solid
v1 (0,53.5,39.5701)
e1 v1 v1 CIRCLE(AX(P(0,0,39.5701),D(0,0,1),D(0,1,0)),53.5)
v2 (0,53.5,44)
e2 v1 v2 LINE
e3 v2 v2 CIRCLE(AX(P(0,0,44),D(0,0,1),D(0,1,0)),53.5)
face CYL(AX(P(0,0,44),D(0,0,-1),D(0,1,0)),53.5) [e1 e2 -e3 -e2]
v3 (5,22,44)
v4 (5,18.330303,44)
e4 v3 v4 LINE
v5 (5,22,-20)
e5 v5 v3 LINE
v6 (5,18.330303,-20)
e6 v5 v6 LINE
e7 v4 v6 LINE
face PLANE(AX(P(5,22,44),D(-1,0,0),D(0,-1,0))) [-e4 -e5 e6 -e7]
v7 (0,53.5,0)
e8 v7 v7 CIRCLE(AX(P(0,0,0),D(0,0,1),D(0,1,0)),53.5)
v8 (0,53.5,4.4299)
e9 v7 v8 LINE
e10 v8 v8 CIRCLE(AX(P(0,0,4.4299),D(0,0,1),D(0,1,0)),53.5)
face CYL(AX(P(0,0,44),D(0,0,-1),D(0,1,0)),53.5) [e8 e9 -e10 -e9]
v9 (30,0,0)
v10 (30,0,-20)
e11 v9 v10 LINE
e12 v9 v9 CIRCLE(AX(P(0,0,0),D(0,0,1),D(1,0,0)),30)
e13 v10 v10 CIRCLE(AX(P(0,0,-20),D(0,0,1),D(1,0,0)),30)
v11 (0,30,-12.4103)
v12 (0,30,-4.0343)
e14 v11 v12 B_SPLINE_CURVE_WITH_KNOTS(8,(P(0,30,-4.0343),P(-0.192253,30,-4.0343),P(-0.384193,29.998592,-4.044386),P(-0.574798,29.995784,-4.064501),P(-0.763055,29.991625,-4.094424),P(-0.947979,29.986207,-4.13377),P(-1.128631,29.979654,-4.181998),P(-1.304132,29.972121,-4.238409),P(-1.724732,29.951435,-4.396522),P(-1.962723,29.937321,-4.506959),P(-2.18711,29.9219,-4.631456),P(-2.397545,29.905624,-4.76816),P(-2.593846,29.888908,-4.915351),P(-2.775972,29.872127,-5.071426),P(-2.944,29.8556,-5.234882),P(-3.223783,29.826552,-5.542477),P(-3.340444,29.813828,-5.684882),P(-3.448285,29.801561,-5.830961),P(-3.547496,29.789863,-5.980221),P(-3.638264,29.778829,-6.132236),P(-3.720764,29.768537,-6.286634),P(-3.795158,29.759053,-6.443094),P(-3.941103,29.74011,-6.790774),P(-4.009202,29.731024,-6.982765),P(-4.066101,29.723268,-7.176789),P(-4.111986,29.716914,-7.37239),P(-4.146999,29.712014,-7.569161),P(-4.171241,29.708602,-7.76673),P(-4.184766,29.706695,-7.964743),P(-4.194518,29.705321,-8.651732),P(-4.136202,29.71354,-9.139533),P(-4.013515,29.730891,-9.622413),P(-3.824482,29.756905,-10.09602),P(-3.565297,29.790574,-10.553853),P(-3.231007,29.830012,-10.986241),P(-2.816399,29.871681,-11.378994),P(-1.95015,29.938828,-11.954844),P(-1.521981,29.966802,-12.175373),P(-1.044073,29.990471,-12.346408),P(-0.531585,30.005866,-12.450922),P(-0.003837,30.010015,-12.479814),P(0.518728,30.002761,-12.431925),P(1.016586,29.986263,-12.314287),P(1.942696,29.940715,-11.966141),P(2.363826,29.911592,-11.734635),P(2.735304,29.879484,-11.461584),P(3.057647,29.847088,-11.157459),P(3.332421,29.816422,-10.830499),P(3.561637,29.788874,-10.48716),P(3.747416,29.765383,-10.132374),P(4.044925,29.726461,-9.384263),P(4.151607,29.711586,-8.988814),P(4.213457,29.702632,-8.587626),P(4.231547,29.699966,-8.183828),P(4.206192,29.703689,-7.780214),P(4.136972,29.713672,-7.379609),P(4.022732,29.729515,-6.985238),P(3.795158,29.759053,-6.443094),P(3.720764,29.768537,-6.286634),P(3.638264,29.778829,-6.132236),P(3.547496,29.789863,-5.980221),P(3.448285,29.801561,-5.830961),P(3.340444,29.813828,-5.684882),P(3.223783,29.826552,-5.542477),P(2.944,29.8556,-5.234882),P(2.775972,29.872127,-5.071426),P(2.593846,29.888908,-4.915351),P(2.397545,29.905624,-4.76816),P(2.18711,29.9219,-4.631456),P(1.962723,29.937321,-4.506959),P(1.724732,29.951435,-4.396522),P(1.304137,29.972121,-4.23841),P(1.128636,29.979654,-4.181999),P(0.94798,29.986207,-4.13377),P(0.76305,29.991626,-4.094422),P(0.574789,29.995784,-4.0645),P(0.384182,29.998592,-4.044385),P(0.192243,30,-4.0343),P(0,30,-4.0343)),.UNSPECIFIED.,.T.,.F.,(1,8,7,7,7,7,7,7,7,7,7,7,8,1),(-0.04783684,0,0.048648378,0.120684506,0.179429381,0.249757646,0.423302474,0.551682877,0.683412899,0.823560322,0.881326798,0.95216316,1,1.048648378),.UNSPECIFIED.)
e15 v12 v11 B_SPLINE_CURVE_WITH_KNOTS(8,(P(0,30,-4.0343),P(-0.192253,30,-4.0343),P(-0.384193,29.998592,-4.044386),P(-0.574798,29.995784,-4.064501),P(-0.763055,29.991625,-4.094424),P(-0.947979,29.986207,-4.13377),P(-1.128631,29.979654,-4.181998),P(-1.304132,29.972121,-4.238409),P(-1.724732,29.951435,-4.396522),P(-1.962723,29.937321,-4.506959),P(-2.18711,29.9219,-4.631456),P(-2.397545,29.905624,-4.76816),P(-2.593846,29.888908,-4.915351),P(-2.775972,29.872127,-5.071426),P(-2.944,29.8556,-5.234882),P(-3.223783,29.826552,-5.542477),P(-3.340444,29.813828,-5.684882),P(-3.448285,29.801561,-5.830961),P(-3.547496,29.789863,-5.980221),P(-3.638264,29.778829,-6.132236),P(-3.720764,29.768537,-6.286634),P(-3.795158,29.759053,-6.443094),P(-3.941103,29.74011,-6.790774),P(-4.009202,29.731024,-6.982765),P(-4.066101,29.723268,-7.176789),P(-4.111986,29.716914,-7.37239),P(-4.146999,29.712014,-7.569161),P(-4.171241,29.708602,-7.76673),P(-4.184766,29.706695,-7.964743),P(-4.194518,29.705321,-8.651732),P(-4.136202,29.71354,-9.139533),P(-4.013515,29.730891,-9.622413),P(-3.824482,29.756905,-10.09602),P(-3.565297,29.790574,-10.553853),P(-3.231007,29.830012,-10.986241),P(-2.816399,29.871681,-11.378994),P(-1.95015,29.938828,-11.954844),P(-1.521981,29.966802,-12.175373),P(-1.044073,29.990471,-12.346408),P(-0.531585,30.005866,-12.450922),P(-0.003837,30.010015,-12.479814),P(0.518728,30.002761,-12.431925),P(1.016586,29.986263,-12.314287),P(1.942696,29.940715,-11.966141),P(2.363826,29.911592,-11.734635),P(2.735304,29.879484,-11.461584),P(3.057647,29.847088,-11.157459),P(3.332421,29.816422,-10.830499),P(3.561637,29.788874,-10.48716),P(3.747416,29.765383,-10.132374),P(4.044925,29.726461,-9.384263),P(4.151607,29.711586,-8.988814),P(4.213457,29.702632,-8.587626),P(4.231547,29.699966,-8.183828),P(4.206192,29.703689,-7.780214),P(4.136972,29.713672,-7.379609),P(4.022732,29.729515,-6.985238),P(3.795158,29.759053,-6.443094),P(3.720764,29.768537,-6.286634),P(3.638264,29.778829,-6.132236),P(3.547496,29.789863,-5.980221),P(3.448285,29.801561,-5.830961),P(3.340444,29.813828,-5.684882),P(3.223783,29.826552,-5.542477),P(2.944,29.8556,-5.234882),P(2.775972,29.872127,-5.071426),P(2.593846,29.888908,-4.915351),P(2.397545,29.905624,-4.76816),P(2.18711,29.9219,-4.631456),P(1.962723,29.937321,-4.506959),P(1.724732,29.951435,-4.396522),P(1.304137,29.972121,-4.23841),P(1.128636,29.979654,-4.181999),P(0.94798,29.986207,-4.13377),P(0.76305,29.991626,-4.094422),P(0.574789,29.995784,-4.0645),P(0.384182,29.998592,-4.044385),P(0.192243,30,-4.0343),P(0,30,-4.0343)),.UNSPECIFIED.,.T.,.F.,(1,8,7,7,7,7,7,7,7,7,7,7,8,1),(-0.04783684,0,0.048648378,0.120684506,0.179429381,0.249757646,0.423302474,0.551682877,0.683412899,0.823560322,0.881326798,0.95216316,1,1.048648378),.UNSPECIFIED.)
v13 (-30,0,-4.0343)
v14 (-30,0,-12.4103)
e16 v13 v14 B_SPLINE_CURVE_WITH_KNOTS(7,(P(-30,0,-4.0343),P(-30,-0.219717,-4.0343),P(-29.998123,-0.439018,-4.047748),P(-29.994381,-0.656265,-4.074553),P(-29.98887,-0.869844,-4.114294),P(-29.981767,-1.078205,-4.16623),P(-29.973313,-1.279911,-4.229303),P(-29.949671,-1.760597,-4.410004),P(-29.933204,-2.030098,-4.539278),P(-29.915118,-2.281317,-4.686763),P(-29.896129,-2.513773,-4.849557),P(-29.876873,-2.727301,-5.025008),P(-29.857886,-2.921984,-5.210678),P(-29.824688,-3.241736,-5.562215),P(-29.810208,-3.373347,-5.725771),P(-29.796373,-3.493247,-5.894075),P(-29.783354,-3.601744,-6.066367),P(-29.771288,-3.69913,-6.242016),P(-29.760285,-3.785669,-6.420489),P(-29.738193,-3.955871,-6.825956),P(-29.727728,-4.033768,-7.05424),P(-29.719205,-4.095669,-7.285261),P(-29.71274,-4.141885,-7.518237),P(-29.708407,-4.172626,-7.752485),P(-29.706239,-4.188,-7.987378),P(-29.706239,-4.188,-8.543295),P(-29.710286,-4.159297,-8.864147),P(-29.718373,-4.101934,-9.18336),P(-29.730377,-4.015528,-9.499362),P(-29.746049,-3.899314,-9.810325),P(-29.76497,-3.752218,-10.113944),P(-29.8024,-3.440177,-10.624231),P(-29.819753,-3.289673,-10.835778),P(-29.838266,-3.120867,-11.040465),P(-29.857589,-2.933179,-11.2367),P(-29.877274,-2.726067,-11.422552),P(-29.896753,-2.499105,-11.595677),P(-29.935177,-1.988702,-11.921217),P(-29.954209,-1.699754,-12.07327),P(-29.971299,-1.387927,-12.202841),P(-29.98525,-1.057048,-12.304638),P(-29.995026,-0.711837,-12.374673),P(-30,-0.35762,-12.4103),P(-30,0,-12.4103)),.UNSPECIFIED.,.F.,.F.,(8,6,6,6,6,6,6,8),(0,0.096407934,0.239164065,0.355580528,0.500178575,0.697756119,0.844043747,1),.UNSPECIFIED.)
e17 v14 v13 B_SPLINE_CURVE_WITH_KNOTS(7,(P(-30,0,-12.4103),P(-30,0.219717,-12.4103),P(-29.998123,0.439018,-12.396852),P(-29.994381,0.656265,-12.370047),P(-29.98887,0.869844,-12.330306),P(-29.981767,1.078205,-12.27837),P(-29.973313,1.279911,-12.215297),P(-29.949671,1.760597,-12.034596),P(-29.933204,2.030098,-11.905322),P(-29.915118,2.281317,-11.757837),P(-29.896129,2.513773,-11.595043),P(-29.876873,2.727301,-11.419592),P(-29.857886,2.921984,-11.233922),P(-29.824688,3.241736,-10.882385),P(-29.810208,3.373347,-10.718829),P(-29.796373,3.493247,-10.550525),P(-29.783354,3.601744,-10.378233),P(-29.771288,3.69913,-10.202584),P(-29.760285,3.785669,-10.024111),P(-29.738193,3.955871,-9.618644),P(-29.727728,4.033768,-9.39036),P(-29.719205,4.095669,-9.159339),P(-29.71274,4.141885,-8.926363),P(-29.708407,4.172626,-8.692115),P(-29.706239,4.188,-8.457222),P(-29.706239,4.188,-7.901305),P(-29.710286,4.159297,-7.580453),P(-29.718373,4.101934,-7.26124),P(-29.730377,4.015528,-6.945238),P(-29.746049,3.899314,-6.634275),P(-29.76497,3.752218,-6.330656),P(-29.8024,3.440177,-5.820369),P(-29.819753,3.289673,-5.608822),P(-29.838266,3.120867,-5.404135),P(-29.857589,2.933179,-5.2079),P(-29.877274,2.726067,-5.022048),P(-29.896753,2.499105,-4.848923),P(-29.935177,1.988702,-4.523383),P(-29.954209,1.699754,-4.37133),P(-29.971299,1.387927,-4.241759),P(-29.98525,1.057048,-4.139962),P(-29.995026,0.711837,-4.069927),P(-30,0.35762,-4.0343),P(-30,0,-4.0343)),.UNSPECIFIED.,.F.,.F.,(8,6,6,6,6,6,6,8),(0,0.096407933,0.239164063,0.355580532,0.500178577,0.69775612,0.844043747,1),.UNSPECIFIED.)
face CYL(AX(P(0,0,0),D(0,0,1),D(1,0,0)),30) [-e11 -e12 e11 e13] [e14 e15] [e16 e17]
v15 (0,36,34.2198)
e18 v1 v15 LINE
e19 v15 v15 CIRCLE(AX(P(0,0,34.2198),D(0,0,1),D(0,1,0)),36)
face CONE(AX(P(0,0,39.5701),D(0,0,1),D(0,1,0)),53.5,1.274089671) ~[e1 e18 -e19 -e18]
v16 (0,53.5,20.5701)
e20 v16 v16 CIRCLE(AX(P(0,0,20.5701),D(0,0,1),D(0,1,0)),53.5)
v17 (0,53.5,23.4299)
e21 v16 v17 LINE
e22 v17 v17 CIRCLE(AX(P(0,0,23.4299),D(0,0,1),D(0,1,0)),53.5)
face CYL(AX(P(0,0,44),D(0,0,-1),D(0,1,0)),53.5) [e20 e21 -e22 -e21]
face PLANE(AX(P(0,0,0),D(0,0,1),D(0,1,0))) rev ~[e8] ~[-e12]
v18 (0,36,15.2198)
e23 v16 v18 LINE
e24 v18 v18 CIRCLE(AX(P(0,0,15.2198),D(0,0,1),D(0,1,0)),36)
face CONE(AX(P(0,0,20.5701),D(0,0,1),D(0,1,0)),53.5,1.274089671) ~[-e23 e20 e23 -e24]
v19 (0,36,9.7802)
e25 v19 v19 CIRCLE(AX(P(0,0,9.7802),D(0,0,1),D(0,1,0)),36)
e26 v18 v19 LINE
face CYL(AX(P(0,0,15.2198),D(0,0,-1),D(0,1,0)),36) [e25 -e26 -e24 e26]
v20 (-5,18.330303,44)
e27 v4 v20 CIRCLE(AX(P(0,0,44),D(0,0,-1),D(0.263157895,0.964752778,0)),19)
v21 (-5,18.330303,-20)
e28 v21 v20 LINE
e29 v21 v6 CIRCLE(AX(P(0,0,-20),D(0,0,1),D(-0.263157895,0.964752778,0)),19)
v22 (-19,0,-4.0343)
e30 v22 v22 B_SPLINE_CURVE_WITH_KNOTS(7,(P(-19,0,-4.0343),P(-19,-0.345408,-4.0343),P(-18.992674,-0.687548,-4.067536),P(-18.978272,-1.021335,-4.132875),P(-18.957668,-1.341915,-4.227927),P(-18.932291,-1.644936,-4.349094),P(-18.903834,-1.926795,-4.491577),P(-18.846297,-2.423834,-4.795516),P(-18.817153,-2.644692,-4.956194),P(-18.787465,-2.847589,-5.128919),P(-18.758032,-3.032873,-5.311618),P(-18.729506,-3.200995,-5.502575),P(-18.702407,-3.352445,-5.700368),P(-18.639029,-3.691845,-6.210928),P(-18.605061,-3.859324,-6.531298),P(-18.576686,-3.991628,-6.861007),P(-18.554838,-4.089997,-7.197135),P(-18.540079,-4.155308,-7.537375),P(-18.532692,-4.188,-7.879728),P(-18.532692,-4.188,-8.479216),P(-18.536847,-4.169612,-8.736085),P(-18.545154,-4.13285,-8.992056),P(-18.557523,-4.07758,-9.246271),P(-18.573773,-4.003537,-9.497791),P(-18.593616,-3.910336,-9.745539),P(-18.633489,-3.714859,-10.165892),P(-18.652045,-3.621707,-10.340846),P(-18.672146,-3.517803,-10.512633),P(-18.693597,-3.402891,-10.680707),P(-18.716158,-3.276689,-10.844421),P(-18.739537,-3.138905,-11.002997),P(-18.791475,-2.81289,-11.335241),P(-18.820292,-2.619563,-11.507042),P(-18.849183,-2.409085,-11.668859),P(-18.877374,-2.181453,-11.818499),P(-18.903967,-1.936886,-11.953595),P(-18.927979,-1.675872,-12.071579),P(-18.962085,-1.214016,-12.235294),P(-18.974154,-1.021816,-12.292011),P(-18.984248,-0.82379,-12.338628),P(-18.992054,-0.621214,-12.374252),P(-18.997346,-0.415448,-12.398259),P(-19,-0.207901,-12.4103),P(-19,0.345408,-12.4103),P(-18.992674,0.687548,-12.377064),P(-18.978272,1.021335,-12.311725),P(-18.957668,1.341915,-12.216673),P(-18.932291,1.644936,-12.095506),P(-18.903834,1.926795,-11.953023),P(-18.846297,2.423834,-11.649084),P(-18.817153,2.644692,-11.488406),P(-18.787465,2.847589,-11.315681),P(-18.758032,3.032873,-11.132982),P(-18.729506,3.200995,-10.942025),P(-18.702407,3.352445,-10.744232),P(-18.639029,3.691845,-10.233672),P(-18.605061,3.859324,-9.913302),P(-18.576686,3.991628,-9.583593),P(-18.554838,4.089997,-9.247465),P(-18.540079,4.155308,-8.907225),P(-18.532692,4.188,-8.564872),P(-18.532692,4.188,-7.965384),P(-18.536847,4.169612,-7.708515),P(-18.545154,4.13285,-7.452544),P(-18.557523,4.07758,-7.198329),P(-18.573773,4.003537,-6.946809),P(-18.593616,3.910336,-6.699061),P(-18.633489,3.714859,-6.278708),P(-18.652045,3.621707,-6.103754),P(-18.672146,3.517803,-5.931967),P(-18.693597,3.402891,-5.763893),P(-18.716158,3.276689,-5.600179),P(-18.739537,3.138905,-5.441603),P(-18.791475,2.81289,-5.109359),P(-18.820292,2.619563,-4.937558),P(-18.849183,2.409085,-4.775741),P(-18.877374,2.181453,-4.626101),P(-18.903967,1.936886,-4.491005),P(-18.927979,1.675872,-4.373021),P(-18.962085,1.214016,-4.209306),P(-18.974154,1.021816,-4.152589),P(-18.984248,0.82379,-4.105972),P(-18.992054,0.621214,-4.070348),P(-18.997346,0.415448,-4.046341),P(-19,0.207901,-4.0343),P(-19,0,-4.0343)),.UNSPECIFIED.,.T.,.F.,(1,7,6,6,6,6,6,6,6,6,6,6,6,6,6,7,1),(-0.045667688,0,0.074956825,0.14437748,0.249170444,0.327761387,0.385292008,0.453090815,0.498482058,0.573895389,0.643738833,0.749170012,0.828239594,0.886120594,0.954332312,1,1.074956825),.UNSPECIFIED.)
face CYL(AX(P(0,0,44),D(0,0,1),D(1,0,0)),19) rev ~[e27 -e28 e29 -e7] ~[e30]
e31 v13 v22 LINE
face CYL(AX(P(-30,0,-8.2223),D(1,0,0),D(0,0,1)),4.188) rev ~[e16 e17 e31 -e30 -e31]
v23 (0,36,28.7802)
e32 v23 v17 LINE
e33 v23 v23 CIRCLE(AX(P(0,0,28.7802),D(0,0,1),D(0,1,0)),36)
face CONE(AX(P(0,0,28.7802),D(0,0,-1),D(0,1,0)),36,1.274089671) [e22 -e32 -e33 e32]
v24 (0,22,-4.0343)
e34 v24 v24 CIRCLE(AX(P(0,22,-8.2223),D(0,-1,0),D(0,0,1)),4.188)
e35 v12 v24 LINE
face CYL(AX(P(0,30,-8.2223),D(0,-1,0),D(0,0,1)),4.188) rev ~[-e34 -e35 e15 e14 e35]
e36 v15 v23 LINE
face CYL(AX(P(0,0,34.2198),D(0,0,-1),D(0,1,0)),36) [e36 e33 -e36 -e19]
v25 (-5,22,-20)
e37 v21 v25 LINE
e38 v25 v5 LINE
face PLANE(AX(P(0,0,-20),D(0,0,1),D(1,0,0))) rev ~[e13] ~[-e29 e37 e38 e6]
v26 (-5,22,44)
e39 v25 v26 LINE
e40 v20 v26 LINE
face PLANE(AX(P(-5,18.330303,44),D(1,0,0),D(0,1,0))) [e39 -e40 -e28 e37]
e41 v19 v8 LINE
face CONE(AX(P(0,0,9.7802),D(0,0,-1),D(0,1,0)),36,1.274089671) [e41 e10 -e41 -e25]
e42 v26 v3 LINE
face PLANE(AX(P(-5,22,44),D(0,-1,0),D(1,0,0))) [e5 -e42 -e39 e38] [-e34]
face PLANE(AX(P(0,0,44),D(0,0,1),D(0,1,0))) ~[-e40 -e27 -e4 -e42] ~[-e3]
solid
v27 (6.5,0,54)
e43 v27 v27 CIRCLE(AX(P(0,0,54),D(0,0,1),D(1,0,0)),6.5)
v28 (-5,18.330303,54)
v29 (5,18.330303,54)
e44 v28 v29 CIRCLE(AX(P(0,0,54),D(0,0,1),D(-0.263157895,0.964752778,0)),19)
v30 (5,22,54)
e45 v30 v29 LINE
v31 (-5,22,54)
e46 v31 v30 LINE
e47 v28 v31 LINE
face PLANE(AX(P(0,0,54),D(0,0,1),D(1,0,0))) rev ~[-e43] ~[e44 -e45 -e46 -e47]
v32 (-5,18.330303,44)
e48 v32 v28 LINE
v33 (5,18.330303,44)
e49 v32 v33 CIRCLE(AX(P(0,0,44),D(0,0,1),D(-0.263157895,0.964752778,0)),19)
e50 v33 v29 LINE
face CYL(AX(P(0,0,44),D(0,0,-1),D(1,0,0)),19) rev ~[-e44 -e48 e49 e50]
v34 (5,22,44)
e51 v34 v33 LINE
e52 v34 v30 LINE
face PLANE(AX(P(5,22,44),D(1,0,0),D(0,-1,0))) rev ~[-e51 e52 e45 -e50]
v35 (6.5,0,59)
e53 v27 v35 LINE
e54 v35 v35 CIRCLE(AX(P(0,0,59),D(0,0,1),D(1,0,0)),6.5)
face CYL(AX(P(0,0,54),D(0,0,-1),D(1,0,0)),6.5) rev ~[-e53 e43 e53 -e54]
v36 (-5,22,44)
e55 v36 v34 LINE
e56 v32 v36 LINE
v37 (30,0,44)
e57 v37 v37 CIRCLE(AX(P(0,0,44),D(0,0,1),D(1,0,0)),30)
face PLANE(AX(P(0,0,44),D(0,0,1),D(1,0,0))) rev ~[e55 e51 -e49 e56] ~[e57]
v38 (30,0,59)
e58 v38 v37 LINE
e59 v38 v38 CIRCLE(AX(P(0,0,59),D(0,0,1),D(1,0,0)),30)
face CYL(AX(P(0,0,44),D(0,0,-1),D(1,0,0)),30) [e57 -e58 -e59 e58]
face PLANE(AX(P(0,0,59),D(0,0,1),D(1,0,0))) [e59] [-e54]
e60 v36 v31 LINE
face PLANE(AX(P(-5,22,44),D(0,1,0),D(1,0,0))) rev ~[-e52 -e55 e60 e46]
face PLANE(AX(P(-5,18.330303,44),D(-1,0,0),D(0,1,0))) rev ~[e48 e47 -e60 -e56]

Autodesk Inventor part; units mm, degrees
ref_plane "YZ Plane" through (0, 0, 0) normal (1, 0, 0) x (0, 1, 0)
sketch "Main Sketch" plane through (0, 0, 0) normal (1, 0, 0) x (0, 1, 0)
  line L0 (0, 44) -> (53.5, 44)
  line L1 (53.5, 44) -> (53.5, 20.5701)
  line L2 (53.5, 20.5701) -> (36, 15.2198)
  line L3 (36, 15.2198) -> (36, 9.7802)
  line L4 (36, 9.7802) -> (53.5, 4.4299)
  line L5 (53.5, 4.4299) -> (53.5, 0)
  line L6 (53.5, 0) -> (0, 0)
  line L7 (50, 19.5) -> (50, 5.5) construction
  line L8 (36, 12.5) -> (50, 12.5) construction
  line L9 (53.5, 20.5701) -> (53.5, 4.4299)
  line L10 (0, -4) -> (0, 24) projected
  line L11 (0, 0) -> (0, 44)
  dimension "d0" = 14
  dimension "d1" = 34
  dimension "d2" = 3.5
  dimension "d6" = 44
  dimension "d21" = 100
  dimension "d25" = 17.5
  dimension "d27" = 12.5
ref_plane "Belt Plane" through (0, 36, 12.5) normal (0, 0, 1) x (1, 0, 0)
revolve "Body" add sketch "Main Sketch" angle 360 about axis through (0, 0, -10) along (0, 0, 1)
revolve "Groove" cut sketch "Main Sketch" angle 360 about axis through (0, 0, -10) along (0, 0, 1) contours L9 L4 L3 L2
fillet "Fillet External" [suppressed]
fillet "Fillet Internal" [suppressed]
pattern_linear "Groove Pattern" count 2 spacing 19 along (0, 0, 1) of "Groove"
sketch "Sketch2" plane through (0, 0, 44) normal (0, 0, 1) x (1, 0, 0)
  circle A0 centre (0, 0) radius 19
  circle A1 centre (0, 0) radius 30
  line L0 (-5, 22) -> (5, 22)
  line L1 (5, 22) -> (5, 16)
  line L2 (5, 16) -> (-5, 16)
  line L3 (-5, 16) -> (-5, 22)
  line L4 (-5, 22) -> (5, 16) construction
  line L5 (5, 22) -> (-5, 16) construction
  circle A2 centre (0, 0) radius 6.5
  point P0 (0, 19)
  point P1 (5, 18.3303)
  point P2 (-5, 18.3303)
  dimension "d28" = 38
  dimension "d29" = 60
  dimension "d30" = 10
  dimension "d31" = 6
  dimension "d47" = 13
extrude "Extrusion1" add sketch "Sketch2" against normal blind 20 from surface at -44 contours A1
ref_plane "Work Plane2" through (0, 30, 44) normal (0, 1, 0) x (-1, 0, 0)
sketch "Sketch3" plane through (0, 30, 44) normal (0, 1, 0) x (-1, 0, 0)
  line L0 (0, -44) -> (0, -64)
  line L1 (30, -64) -> (-30, -64) projected
  circle A0 centre (0, -52.2223) radius 5
  dimension "d34" = 10
hole "Hole1" at (0, 30, -8.2223) direction (0, -1, 0) diameter 8.376 depth 27.3 tip angle 118 thread size "M10x1.5" class "6H" standard "ISO Metric profile"
extrude "Extrusion2" cut sketch "Sketch2" against normal through all contours A0 L3 L2 L1 | L1 L2 L3 A0 | A0 L3 L0 L1 | A2
pattern_circular "Circular Pattern1" count 2 over 90 about axis through (0, 0, 44) along (0, 0, 1) of "Hole1"
extrude "Extrusion3" add sketch "Sketch2" along normal blind 10 separate body contours A1
sketch "Sketch4" plane through (0, 0, 54) normal (0, 0, 1) x (1, 0, 0)
  circle A0 centre (0, 0) radius 30
  arc A1 (-5, 18.3303) -> (5, 18.3303) centre (0, 0) ccw projected
  circle A2 centre (0, 0) radius 6.5
  dimension "d50" = 13
extrude "Extrusion4" add sketch "Sketch4" along normal blind 5 bodies 2
equation "\"d0\" = da_Bw"
equation "\"d1\" = da_Alfa"
equation "\"d2\" = da_c"
equation "\"d21\" = da_Dw"
equation "\"d25\" = da_Hd"
equation "\"d27\" = da_Se"
equation "\"da_r1\" = 0"
equation "\"da_r2\" = 0"
equation "\"d18\" = da_Sg"
equation "\"d5\" = da_Se"
equation "\"da_Bw\" = 14"
equation "\"da_Alfa\" = 34deg"
equation "\"da_c\" = 3.5"
equation "\"da_Dw\" = 100"
equation "\"da_Hd\" = 17.5"
equation "\"da_Se\" = 12.5"
equation "\"da_Sg\" = 19"
properties part number "Grooved Pulley1" material "Steel"
